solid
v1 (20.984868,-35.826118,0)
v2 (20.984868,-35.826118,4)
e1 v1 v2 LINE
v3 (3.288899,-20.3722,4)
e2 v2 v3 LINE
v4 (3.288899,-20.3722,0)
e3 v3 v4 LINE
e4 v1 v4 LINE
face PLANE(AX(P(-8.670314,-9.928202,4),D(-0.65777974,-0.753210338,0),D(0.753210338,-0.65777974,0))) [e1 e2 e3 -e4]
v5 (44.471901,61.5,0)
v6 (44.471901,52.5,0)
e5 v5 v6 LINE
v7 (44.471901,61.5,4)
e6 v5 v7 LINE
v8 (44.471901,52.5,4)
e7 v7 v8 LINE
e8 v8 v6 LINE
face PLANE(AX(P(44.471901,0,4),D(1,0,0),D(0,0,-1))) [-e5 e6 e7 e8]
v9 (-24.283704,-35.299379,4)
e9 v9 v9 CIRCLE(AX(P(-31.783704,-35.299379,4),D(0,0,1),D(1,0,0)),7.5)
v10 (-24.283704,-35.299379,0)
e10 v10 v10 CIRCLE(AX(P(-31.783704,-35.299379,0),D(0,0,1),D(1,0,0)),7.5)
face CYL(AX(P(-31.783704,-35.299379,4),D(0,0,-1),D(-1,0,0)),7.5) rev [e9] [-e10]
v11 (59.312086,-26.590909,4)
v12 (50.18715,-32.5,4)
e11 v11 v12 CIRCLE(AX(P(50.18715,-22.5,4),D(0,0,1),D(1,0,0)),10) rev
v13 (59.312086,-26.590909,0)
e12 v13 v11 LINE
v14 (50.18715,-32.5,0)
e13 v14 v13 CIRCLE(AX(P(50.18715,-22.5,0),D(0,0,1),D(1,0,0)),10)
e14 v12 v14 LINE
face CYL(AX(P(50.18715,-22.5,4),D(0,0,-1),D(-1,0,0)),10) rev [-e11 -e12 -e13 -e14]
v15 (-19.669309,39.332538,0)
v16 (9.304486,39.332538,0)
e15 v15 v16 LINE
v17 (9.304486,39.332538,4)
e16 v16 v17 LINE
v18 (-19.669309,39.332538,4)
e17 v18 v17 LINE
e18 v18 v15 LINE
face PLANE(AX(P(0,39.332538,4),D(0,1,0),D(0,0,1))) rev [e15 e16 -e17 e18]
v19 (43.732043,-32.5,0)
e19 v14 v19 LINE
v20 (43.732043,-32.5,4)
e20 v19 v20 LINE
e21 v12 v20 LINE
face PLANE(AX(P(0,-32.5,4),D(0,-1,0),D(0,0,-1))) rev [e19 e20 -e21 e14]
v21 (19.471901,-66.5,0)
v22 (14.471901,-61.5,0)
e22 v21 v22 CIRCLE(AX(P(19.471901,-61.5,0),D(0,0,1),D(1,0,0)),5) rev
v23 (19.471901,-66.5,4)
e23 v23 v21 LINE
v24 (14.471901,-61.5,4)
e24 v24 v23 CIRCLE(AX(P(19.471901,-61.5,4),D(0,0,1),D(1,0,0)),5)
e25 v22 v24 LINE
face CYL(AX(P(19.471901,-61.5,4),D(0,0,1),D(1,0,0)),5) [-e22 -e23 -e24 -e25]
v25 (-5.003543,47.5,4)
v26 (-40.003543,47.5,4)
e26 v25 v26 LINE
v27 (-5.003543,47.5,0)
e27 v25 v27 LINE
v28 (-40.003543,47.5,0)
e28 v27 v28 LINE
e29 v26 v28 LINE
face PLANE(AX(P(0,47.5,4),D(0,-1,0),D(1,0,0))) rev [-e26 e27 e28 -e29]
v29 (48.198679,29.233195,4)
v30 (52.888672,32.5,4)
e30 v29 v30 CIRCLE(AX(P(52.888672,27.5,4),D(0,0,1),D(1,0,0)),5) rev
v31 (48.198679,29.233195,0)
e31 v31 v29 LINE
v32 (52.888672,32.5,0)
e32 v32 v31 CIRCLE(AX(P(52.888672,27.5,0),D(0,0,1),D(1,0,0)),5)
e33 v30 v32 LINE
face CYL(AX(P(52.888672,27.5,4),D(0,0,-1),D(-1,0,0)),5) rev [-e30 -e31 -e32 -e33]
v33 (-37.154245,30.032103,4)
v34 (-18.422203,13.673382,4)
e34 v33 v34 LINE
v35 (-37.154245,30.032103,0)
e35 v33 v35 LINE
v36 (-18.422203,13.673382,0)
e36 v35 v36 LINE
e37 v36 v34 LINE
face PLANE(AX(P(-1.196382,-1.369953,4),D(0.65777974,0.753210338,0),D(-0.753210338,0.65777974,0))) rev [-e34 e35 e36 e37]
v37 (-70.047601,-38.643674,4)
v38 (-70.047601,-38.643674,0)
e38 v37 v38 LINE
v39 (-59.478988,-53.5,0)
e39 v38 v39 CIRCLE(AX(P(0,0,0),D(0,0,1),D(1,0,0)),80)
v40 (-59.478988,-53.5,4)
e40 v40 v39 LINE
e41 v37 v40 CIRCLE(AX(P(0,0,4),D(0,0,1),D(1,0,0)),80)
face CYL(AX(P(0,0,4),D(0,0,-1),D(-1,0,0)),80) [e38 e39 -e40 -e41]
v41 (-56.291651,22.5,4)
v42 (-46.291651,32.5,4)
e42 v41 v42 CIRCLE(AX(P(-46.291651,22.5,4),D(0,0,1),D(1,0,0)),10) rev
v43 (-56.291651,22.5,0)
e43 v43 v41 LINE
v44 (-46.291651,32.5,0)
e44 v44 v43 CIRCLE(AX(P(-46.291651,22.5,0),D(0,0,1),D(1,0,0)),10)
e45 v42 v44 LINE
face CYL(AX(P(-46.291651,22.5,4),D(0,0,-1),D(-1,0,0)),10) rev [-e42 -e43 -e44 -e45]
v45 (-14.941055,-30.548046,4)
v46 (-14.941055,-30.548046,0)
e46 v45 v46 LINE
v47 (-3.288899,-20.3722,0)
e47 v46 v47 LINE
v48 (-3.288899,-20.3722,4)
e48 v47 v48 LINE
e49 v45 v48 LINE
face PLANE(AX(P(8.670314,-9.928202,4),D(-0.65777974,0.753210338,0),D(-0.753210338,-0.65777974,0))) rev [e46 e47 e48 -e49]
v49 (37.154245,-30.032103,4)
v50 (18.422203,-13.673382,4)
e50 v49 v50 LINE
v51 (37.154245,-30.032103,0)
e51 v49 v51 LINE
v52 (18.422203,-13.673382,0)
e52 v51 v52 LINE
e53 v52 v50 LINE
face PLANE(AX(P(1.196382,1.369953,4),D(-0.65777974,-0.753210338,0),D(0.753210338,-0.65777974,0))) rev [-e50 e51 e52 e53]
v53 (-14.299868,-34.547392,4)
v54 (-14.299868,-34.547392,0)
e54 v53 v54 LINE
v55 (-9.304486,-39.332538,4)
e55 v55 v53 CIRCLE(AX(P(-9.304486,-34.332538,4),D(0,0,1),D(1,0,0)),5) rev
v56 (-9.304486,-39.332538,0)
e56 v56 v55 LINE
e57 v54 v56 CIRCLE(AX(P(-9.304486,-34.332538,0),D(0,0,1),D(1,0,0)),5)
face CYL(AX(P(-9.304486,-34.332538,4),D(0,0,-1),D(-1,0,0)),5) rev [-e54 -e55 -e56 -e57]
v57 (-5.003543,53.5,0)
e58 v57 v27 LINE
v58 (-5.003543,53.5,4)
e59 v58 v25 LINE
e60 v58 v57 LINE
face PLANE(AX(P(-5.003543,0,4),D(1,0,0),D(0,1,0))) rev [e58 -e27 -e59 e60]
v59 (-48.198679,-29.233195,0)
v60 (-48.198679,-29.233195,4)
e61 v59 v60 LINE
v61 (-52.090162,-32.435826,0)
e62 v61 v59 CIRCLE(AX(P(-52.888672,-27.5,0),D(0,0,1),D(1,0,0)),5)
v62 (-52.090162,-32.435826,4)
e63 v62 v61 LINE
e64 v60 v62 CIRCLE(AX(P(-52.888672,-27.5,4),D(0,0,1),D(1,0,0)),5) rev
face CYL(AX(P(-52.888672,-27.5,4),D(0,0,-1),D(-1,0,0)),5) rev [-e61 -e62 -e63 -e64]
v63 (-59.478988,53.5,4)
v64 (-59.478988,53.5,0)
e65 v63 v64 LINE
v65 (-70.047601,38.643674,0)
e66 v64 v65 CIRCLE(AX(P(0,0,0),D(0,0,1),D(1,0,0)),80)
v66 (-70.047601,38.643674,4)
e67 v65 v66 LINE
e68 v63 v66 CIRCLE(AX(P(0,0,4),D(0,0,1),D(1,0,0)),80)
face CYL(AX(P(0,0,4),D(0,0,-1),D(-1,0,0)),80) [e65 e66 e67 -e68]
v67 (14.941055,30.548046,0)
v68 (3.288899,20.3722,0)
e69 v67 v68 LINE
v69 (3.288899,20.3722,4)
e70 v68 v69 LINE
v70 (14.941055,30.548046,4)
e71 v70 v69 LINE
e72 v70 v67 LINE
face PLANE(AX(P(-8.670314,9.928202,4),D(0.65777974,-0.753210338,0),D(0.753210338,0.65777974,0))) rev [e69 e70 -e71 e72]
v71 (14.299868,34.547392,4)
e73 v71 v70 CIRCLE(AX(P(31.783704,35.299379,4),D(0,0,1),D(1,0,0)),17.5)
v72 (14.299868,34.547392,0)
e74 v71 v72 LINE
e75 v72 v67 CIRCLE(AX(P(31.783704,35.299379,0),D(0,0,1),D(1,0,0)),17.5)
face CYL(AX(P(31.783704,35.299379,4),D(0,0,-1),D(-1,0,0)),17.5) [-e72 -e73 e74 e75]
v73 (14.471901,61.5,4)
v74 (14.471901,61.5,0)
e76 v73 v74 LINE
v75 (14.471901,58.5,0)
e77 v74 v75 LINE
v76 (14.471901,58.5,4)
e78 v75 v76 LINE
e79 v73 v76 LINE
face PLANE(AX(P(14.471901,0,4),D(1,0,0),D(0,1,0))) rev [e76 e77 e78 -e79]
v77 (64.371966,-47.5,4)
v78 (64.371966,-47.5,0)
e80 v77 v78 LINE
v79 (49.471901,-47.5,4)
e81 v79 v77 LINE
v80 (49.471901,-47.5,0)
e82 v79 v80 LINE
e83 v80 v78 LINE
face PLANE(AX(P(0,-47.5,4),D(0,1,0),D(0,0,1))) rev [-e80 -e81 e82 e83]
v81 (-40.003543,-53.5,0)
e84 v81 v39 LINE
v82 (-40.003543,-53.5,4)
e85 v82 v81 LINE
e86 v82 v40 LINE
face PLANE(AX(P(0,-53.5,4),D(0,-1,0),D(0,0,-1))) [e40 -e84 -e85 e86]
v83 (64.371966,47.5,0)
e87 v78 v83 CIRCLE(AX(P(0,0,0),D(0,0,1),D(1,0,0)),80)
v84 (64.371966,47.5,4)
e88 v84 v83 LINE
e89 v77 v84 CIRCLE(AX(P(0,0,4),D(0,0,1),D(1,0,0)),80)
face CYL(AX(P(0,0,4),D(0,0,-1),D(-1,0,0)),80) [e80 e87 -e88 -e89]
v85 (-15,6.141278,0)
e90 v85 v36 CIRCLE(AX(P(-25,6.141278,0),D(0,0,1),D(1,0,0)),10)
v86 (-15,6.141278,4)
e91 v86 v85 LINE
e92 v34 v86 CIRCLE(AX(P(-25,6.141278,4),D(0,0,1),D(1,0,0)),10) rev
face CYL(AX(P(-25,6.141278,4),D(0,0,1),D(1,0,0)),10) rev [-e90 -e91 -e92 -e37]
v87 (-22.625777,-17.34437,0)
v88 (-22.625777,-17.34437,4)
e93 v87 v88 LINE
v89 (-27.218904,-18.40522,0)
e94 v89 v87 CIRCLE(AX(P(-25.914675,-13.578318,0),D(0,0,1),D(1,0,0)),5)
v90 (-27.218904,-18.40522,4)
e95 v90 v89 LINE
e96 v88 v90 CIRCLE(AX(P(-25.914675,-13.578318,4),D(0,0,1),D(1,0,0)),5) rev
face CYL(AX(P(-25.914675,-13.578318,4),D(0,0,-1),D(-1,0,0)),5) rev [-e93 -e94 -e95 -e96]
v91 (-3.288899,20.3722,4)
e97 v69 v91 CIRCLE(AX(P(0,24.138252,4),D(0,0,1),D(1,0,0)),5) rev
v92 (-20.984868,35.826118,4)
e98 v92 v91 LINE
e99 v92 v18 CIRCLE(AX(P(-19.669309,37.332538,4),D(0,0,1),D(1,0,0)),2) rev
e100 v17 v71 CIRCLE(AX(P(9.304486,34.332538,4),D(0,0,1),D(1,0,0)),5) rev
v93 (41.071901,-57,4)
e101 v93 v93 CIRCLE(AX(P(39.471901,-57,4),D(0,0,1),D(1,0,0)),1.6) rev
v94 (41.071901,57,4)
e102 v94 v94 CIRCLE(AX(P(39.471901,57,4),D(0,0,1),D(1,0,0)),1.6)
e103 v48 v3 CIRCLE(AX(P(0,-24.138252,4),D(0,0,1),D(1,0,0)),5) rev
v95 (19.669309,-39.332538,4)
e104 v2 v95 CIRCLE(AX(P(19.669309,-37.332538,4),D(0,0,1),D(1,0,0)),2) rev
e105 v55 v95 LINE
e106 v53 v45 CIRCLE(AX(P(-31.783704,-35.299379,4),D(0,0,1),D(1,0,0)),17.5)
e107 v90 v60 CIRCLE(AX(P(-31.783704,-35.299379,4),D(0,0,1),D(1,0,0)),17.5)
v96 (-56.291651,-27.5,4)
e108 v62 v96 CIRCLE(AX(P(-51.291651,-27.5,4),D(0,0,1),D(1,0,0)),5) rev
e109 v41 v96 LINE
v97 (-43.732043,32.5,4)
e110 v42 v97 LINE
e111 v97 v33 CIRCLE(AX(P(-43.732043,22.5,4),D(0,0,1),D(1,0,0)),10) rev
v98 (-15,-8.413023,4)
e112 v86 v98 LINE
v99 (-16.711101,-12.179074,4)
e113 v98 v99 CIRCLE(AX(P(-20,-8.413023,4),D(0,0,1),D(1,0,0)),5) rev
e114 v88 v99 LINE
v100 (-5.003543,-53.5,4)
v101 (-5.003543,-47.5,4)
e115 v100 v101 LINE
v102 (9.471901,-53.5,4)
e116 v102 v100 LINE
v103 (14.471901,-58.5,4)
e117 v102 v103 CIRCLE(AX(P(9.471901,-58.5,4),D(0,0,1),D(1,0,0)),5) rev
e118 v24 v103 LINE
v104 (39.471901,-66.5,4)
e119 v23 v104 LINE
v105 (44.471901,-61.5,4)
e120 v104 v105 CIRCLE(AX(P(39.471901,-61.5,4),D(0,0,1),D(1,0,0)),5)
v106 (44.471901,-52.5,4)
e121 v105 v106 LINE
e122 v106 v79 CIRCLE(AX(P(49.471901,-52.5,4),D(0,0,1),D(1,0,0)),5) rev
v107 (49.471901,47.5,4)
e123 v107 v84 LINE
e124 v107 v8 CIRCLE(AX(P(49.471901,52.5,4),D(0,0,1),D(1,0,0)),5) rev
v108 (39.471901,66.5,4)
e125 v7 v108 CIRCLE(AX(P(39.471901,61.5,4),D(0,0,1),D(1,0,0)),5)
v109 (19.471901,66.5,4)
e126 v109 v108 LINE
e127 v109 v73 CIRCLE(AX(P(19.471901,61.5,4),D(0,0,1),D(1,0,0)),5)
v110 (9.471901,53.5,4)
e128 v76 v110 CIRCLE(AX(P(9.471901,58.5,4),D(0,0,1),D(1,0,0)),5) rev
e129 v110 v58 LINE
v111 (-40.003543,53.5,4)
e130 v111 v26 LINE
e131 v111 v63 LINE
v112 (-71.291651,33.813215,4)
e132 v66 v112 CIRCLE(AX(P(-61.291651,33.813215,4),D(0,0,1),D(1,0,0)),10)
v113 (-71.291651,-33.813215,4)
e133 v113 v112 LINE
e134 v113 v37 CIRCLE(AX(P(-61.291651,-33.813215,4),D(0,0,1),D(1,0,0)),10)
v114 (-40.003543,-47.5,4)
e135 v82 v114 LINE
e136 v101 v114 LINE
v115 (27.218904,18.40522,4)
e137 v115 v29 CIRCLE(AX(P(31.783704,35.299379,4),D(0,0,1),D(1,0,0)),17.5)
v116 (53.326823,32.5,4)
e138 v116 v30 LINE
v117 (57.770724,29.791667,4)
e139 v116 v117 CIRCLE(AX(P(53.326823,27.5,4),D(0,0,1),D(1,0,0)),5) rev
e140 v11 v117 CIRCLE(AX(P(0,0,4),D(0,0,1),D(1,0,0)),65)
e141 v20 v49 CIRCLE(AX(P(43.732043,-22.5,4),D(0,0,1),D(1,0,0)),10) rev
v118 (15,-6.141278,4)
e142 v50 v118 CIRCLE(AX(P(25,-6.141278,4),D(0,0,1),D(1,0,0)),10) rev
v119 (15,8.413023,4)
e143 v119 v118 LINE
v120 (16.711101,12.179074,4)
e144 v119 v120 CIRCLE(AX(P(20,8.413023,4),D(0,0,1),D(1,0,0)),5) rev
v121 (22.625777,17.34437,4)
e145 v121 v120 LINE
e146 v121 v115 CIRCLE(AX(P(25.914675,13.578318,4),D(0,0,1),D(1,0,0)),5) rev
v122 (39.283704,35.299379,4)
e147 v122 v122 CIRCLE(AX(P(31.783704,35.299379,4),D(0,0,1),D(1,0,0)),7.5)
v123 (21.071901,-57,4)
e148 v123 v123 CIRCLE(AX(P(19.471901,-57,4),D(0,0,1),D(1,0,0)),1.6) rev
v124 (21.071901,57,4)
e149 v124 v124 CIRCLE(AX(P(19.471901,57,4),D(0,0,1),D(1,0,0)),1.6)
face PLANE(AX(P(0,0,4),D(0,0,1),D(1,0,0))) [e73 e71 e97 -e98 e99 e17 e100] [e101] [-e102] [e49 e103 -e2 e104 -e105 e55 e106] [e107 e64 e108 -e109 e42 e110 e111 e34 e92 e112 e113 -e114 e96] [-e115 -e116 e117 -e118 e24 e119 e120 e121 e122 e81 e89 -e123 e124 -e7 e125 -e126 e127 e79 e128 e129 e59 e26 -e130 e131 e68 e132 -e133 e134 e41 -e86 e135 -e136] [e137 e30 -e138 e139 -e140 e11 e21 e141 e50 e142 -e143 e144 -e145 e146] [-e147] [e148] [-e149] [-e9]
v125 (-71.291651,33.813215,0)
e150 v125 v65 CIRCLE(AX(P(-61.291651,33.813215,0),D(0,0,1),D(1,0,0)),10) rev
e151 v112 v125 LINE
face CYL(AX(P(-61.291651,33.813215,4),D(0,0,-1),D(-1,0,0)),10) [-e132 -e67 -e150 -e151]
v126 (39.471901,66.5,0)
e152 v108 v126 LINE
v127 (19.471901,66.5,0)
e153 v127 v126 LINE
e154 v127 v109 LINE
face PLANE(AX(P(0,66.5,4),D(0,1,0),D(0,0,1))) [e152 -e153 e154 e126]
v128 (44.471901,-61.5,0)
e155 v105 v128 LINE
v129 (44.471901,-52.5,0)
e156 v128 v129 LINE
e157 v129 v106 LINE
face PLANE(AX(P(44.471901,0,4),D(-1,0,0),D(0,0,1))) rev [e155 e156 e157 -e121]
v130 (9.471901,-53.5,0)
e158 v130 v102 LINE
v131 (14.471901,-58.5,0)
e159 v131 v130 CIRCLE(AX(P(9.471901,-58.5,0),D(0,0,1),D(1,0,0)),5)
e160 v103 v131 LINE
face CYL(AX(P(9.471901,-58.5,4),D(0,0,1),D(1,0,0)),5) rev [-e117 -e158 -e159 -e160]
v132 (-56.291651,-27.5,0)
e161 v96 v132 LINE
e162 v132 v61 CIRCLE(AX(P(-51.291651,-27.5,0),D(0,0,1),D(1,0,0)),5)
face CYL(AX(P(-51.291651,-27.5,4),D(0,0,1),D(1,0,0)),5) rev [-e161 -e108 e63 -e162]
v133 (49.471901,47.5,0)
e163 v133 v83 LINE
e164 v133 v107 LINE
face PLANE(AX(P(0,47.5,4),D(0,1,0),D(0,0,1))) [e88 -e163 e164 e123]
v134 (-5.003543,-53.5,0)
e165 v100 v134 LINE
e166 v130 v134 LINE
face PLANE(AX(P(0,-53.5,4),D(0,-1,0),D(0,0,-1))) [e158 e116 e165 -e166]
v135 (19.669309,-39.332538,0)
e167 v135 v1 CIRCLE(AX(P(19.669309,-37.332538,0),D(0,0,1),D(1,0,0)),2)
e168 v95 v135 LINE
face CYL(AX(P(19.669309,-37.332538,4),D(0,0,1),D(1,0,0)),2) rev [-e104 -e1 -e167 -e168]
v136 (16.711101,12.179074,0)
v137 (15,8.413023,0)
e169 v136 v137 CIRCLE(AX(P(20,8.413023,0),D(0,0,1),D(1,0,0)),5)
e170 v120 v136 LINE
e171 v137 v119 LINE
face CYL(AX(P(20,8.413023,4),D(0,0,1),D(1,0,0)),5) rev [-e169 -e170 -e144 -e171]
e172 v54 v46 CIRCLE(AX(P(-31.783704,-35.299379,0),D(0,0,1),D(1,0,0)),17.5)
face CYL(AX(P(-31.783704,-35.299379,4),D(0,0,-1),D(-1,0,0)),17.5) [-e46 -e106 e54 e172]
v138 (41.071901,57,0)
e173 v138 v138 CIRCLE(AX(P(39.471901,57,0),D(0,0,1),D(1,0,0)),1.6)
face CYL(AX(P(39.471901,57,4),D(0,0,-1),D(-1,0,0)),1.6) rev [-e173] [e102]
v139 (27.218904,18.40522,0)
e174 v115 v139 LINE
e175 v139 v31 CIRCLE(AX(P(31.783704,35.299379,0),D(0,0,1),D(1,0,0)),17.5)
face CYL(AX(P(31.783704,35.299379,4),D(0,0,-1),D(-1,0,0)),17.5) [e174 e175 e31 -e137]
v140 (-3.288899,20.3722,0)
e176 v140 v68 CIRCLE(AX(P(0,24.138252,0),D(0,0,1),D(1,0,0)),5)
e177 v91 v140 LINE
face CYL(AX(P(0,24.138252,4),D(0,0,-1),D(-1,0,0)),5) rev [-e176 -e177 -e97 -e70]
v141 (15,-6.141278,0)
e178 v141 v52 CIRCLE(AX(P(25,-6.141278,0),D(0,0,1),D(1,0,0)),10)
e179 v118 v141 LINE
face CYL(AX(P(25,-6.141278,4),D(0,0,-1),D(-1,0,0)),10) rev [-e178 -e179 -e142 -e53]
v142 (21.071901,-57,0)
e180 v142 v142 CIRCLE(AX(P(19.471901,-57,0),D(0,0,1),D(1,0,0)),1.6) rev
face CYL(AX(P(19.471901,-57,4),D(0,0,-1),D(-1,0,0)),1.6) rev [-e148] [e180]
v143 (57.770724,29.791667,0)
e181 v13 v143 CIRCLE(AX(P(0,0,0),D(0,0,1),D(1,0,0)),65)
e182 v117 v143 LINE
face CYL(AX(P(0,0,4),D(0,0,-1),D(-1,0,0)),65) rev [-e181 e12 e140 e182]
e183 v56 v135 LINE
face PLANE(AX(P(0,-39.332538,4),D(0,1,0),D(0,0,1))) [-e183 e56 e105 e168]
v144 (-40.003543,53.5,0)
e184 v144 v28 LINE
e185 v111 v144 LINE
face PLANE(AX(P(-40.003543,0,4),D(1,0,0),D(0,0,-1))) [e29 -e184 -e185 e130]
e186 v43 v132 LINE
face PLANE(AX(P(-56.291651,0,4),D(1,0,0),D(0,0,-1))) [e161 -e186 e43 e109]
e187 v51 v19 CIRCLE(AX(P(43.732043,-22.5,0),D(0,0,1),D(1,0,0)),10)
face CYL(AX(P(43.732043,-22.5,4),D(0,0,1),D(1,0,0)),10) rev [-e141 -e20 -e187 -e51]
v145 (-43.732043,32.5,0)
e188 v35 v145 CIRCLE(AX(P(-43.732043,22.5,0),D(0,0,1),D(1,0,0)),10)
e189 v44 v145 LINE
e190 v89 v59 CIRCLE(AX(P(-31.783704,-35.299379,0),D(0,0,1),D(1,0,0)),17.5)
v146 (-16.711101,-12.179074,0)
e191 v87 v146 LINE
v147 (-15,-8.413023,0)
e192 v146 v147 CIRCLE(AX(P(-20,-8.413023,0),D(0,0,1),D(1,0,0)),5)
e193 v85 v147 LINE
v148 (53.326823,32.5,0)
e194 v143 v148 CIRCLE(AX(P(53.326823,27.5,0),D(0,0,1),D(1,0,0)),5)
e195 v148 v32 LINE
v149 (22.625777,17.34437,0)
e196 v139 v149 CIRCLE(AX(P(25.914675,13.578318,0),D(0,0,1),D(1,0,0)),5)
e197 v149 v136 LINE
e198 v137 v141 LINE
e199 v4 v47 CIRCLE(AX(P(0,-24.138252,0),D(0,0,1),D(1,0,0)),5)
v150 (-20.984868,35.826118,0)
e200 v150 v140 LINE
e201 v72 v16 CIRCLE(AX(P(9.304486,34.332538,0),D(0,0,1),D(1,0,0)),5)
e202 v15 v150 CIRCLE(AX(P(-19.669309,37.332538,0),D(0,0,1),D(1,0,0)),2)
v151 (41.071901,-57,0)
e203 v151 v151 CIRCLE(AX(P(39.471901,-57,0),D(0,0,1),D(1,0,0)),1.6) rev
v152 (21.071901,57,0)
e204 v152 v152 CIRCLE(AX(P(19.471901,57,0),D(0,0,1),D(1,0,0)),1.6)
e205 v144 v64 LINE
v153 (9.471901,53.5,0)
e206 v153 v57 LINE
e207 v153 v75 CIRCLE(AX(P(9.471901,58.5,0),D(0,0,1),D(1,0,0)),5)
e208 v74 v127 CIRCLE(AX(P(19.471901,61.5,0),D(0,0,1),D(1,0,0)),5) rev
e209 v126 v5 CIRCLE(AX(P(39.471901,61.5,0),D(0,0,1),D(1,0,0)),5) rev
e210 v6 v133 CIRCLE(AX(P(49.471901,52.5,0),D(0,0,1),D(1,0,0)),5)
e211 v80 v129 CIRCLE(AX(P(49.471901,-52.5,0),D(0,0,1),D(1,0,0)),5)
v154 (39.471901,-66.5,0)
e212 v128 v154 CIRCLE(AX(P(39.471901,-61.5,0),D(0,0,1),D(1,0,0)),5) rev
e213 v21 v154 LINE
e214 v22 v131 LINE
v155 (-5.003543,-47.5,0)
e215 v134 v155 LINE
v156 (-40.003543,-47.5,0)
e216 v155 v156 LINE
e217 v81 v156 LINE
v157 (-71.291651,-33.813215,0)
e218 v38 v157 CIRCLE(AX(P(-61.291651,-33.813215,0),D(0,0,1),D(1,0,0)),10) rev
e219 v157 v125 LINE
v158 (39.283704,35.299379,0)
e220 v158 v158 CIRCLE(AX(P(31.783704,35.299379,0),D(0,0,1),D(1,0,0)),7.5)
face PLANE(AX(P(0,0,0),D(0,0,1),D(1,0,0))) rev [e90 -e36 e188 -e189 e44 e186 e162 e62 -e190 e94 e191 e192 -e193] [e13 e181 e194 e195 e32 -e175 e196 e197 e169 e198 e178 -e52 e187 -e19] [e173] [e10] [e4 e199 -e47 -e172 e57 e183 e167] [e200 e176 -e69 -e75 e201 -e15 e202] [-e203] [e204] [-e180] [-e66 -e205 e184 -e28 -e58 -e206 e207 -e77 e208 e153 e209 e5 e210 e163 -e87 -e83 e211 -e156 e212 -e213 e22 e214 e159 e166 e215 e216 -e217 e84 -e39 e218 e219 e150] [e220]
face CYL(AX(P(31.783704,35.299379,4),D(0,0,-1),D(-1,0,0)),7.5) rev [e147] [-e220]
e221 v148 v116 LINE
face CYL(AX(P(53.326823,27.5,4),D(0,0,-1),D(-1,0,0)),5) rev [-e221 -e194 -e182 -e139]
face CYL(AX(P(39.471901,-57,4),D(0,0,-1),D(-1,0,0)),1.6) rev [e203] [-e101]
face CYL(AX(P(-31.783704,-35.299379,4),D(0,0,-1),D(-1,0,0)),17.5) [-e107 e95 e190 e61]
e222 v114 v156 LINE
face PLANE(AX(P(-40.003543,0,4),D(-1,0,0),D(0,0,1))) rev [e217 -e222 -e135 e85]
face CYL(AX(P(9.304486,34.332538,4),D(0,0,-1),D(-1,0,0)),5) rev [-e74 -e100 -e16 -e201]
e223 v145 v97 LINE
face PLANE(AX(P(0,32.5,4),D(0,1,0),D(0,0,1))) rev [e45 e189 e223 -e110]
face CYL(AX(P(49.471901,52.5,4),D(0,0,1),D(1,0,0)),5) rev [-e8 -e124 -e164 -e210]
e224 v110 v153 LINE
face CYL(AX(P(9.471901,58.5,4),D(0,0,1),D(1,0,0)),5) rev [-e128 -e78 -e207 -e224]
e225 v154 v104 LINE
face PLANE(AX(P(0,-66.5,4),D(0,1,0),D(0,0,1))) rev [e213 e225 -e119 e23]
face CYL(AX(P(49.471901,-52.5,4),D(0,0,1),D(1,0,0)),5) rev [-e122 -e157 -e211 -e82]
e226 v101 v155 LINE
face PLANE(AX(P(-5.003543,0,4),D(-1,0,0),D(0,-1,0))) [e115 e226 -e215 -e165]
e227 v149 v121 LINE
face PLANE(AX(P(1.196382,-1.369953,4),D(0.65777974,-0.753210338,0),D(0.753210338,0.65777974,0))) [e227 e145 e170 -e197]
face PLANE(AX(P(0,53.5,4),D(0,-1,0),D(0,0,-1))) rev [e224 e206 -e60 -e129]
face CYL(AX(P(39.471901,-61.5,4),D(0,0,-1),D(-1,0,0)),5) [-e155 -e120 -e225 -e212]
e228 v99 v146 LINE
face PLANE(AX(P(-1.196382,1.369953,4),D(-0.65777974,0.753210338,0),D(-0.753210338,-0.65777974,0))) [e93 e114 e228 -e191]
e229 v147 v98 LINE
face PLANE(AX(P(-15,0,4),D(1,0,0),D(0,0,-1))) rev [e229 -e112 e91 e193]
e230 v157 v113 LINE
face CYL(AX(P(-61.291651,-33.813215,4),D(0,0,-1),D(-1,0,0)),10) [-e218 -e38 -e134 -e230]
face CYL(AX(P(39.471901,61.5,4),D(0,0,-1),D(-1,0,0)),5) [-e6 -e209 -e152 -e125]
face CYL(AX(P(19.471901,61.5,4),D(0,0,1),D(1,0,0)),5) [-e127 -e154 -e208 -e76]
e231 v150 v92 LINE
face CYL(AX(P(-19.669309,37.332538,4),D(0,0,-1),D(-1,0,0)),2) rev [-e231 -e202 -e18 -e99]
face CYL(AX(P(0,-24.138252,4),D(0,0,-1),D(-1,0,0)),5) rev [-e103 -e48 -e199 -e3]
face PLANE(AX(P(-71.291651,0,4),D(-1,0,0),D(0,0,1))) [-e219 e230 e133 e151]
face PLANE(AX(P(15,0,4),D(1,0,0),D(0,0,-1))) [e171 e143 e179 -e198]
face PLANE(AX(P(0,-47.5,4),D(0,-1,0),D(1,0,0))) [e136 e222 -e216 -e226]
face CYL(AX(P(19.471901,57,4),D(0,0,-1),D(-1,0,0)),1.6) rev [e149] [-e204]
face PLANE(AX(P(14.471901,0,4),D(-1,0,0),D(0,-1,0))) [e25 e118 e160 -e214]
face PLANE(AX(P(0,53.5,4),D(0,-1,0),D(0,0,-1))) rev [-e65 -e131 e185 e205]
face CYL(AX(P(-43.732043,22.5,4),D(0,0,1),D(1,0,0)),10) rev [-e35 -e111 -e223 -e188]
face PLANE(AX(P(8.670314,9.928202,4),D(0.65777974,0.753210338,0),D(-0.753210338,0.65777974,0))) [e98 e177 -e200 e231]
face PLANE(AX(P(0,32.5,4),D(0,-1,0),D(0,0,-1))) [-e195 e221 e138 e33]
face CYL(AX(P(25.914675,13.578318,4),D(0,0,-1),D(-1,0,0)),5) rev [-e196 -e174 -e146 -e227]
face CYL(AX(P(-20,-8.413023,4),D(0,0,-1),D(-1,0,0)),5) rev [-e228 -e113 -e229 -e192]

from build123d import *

# Parameters (mm, degrees)
ESBO_O1_R                = 7.5
ESBO_O1_R_2              = 1.6
RESSALTO_EXTRUS_O1_DEPTH = 4
FILETE2_R                = 10
FILETE3_R                = 5
FILETE4_R                = 2


with BuildPart() as part:
    # Esboço1 → Ressalto-extrusão1 (new body)
    with BuildSketch(Plane.XY):
        with BuildLine():
            Line((14.471901241, -53.5), (14.471901241, -66.5))
            Line((14.471901241, -66.5), (44.471901241, -66.5))
            Line((44.471901241, -66.5), (44.471901241, -47.5))
            Line((44.471901241, -47.5), (64.371965948, -47.5))
            ThreePointArc((64.371965948, -47.5), (80, 0), (64.371965948, 47.5))
            Line((64.371965948, 47.5), (44.471901241, 47.5))
            Line((44.471901241, 47.5), (44.471901241, 66.5))
            Line((44.471901241, 66.5), (14.471901241, 66.5))
            Line((14.471901241, 66.5), (14.471901241, 53.5))
            Line((14.471901241, 53.5), (-5.003543323, 53.5))
            Line((-5.003543323, 53.5), (-5.003543323, 47.5))
            Line((-5.003543323, 47.5), (-40.003543323, 47.5))
            Line((-40.003543323, 47.5), (-40.003543323, 53.5))
            Line((-40.003543323, 53.5), (-59.478987886, 53.5))
            ThreePointArc((-59.478987886, 53.5), (-65.948635083, 45.285511266), (-71.291651246, 36.297389198))
            Line((-71.291651246, 36.297389198), (-71.291651246, -36.297389198))
            ThreePointArc((-71.291651246, -36.297389198), (-65.948635083, -45.285511266), (-59.478987886, -53.5))
            Line((-59.478987886, -53.5), (-40.003543323, -53.5))
            Line((-40.003543323, -53.5), (-40.003543323, -47.5))
            Line((-40.003543323, -47.5), (-5.003543323, -47.5))
            Line((-5.003543323, -47.5), (-5.003543323, -53.5))
            Line((-5.003543323, -53.5), (14.471901241, -53.5))
        make_face()
        with Locations((-31.783703802, -35.29937921)):
            Circle(ESBO_O1_R, mode=Mode.SUBTRACT)
        with Locations((19.471901241, -57)):
            Circle(ESBO_O1_R_2, mode=Mode.SUBTRACT)
        with Locations((39.471901241, -57)):
            Circle(ESBO_O1_R_2, mode=Mode.SUBTRACT)
        with BuildLine():
            Line((25, -39.332538239), (-14.754798134, -39.332538239))
            ThreePointArc((-14.754798134, -39.332538239), (-14.287636143, -34.928412284), (-14.941054623, -30.548045856))
            Line((-14.941054623, -30.548045856), (0, -17.5))
            Line((0, -17.5), (25, -39.332538239))
        make_face(mode=Mode.SUBTRACT)
        with BuildLine():
            Line((-15, -10.684767074), (-24.807750727, -19.249890785))
            ThreePointArc((-24.807750727, -19.249890785), (-40.174599446, -19.942202702), (-49.058352164, -32.5))
            Line((-49.058352164, -32.5), (-56.291651246, -32.5))
            Line((-56.291651246, -32.5), (-56.291651246, 32.5))
            Line((-56.291651246, 32.5), (-39.980184035, 32.5))
            Line((-39.980184035, 32.5), (-15, 10.684767074))
            Line((-15, 10.684767074), (-15, -10.684767074))
        make_face(mode=Mode.SUBTRACT)
        with BuildLine():
            Line((49.058352164, 32.5), (56.291651246, 32.5))
            ThreePointArc((56.291651246, 32.5), (65, 0), (56.291651246, -32.5))
            Line((56.291651246, -32.5), (39.980184035, -32.5))
            Line((39.980184035, -32.5), (15, -10.684767074))
            Line((15, -10.684767074), (15, 10.684767074))
            Line((15, 10.684767074), (24.807750727, 19.249890785))
            ThreePointArc((24.807750727, 19.249890785), (40.174599446, 19.942202702), (49.058352164, 32.5))
        make_face(mode=Mode.SUBTRACT)
        with BuildLine():
            Line((0, 17.5), (-25, 39.332538239))
            Line((-25, 39.332538239), (14.754798134, 39.332538239))
            ThreePointArc((14.754798134, 39.332538239), (14.287636143, 34.928412284), (14.941054623, 30.548045856))
            Line((14.941054623, 30.548045856), (0, 17.5))
        make_face(mode=Mode.SUBTRACT)
        with Locations((19.471901241, 57)):
            Circle(ESBO_O1_R_2, mode=Mode.SUBTRACT)
        with Locations((39.471901241, 57)):
            Circle(ESBO_O1_R_2, mode=Mode.SUBTRACT)
        with Locations((31.783703802, 35.29937921)):
            Circle(ESBO_O1_R, mode=Mode.SUBTRACT)
    extrude(amount=RESSALTO_EXTRUS_O1_DEPTH)

    # Filete2
    filete2_edges = [part.edges().sort_by_distance(p)[0] for p in [
        (-71.291651246, -36.297389198, 2),
        (-71.291651246, 36.297389198, 2),
        (15, -10.684767074, 2),
        (39.980184035, -32.5, 2),
        (56.291651246, -32.5, 2),
        (-15, 10.684767074, 2),
        (-39.980184035, 32.5, 2),
        (-56.291651246, 32.5, 2),
    ]]
    fillet(filete2_edges, radius=FILETE2_R)

    # Filete3
    # the kernel refuses this fillet: 5 mm, written as the material it adds along each edge
    with BuildSketch(Plane(origin=(56.291651246, 32.5, 0), x_dir=(0.47930172295418866, -0.8776501913479802, 0), z_dir=(0, 0, 1))) as filete3_piece_1:
        with BuildLine():
            CenterArc((2.96720344, -4.998591114), FILETE3_R, 88.639806368, 62.720387264)
            Line((-1.421047517, -2.602082499), (0, 0))
            ThreePointArc((0, 0), (1.542945789, 0.018315517), (3.085891577, 0))
        make_face()
    extrude(amount=4)
    with BuildSketch(Plane(origin=(49.058352164, 32.5, 0), x_dir=(1, 0, 0), z_dir=(0, 0, 1))) as filete3_piece_2:
        with BuildLine():
            CenterArc((3.830319867, -5), FILETE3_R, 90, 69.718116788)
            ThreePointArc((-0.859673073, -3.26680462), (-0.35082821, -1.654193676), (0, 0))
            Line((0, 0), (3.830319867, 0))
        make_face()
    extrude(amount=4)
    with BuildSketch(Plane(origin=(24.807750727, 19.249890785, 0), x_dir=(0.9437647380510182, -0.3306177841730431, 0), z_dir=(0, 0, 1))) as filete3_piece_3:
        with BuildLine():
            CenterArc((2.919799374, -4.986661539), FILETE3_R, 94.186027535, 56.251011404)
            Line((-1.429270912, -2.519763153), (0, 0))
            ThreePointArc((0, 0), (1.277412226, -0.046684613), (2.554824452, 0))
        make_face()
    extrude(amount=4)
    with BuildSketch(Plane(origin=(15, 10.684767074, 0), x_dir=(0.7532103380208672, 0.6577797402615034, 0), z_dir=(0, 0, 1))) as filete3_piece_4:
        with BuildLine():
            CenterArc((FILETE3_R * 0.454348861751, -FILETE3_R), FILETE3_R, 90, 48.869237816)
            Line((-FILETE3_R * 0.29886147627, -FILETE3_R * 0.342220259738), (0, 0))
            Line((0, 0), (FILETE3_R * 0.454348861751, 0))
        make_face()
    extrude(amount=4)
    with BuildSketch(Plane(origin=(-15, -10.684767074, 0), x_dir=(0, 1, 0), z_dir=(0, 0, 1))) as filete3_piece_5:
        with BuildLine():
            CenterArc((FILETE3_R * 0.454348861751, FILETE3_R), FILETE3_R, 221.130762184, 48.869237816)
            Line((-FILETE3_R * 0.29886147627, FILETE3_R * 0.342220259738), (0, 0))
            Line((0, 0), (FILETE3_R * 0.454348861751, 0))
        make_face()
    extrude(amount=4)
    with BuildSketch(Plane(origin=(-24.807750727, -19.249890785, 0), x_dir=(0.7532103380209099, 0.6577797402614547, 0), z_dir=(0, 0, 1))) as filete3_piece_6:
        with BuildLine():
            CenterArc((2.896898633, 5), FILETE3_R, 213.748988596, 56.251011404)
            ThreePointArc((-1.260498463, 2.222222222), (-0.589642299, 1.13414435), (0, 0))
            Line((0, 0), (2.896898633, 0))
        make_face()
    extrude(amount=4)
    with BuildSketch(Plane(origin=(-49.058352164, -32.5, 0), x_dir=(0.2544898792174261, 0.9670754372725532, 0), z_dir=(0, 0, 1))) as filete3_piece_7:
        with BuildLine():
            CenterArc((3.860599546, 4.976657656), FILETE3_R, 194.74336021, 69.718116788)
            Line((-0.97477764, 3.70420826), (0, 0))
            ThreePointArc((0, 0), (1.689012301, 0.081698204), (3.378024603, 0))
        make_face()
    extrude(amount=4)
    with BuildSketch(Plane(origin=(14.754798134, 39.332538239, 0), x_dir=(-0.09464454898712658, -0.9955111296952049, 0), z_dir=(0, 0, 1))) as filete3_piece_8:
        with BuildLine():
            CenterArc((5.493397952, -4.952623325), FILETE3_R, 97.893660423, 87.537201367)
            Line((0.515842303, -5.42584607), (0, 0))
            ThreePointArc((0, 0), (2.403361604, -0.165818364), (4.806723208, 0))
        make_face()
    extrude(amount=4)
    with BuildSketch(Plane(origin=(0, 17.5, 0), x_dir=(0.7532103380208671, 0.6577797402615035, 0), z_dir=(0, 0, 1)), Plane(origin=(0, -17.5, 0), x_dir=(-0.7532103380208676, -0.6577797402615031, 0), z_dir=(0, 0, 1))) as filete3_piece_9:
        with BuildLine():
            CenterArc((FILETE3_R * 0.873301529543, FILETE3_R), FILETE3_R, 187.738475632, 82.261524368)
            Line((-FILETE3_R * 0.117591471468, FILETE3_R * 0.865348373397), (0, 0))
            Line((0, 0), (FILETE3_R * 0.873301529543, 0))
        make_face()
    extrude(amount=4)
    with BuildSketch(Plane(origin=(-14.754798134, -39.332538239, 0), x_dir=(1, 0, 0), z_dir=(0, 0, 1))) as filete3_piece_10:
        with BuildLine():
            CenterArc((5.450311812, 5), FILETE3_R, 182.462798633, 87.537201367)
            ThreePointArc((0.45493015, 4.785146451), (0.392539102, 2.376879421), (0, 0))
            Line((0, 0), (5.450311812, 0))
        make_face()
    extrude(amount=4)
    with BuildSketch(Plane(origin=(14.471901241, 53.5, 0), x_dir=(-1, 0, 0), z_dir=(0, 0, 1)), Plane(origin=(44.471901241, -47.5, 0), x_dir=(1, 0, 0), z_dir=(0, 0, 1)), Plane(origin=(44.471901241, 47.5, 0), x_dir=(0, 1, 0), z_dir=(0, 0, 1))) as filete3_piece_11:
        with BuildLine():
            CenterArc((FILETE3_R, -FILETE3_R), FILETE3_R, 90, 90)
            Line((0, -FILETE3_R), (0, 0))
            Line((0, 0), (FILETE3_R, 0))
        make_face()
    extrude(amount=4)
    with BuildSketch(Plane(origin=(14.471901241, -53.5, 0), x_dir=(-1, 0, 0), z_dir=(0, 0, 1)), Plane(origin=(-56.291651246, -32.5, 0), x_dir=(1, 0, 0), z_dir=(0, 0, 1))) as filete3_piece_12:
        with BuildLine():
            CenterArc((FILETE3_R, FILETE3_R), FILETE3_R, 180, 90)
            Line((0, FILETE3_R), (0, 0))
            Line((0, 0), (FILETE3_R, 0))
        make_face()
    extrude(amount=4)
    # the kernel refuses this fillet: 5 mm, written as the material it takes off along each edge
    with BuildSketch(Plane(origin=(14.471901241, -66.5, -12.5), x_dir=(0, 1, 0), z_dir=(0, 0, 1)), Plane(origin=(44.471901241, -66.5, -12.5), x_dir=(-1, 0, 0), z_dir=(0, 0, 1))) as filete3_2_piece_1:
        with BuildLine():
            CenterArc((FILETE3_R, -FILETE3_R), FILETE3_R, 90, 90)
            Line((0, -FILETE3_R), (0, 0))
            Line((0, 0), (FILETE3_R, 0))
        make_face()
    extrude(amount=29, mode=Mode.SUBTRACT)
    with BuildSketch(Plane(origin=(14.471901241, 66.5, -12.5), x_dir=(0, -1, 0), z_dir=(0, 0, 1)), Plane(origin=(44.471901241, 66.5, -12.5), x_dir=(-1, 0, 0), z_dir=(0, 0, 1))) as filete3_2_piece_2:
        with BuildLine():
            CenterArc((FILETE3_R, FILETE3_R), FILETE3_R, 180, 90)
            Line((0, FILETE3_R), (0, 0))
            Line((0, 0), (FILETE3_R, 0))
        make_face()
    extrude(amount=29, mode=Mode.SUBTRACT)

    # Filete4
    filete4_edges = [part.edges().sort_by_distance(p)[0] for p in [
        (-25, 39.332538239, 2),
        (25, -39.332538239, 2),
    ]]
    fillet(filete4_edges, radius=FILETE4_R)


solid = part.part
